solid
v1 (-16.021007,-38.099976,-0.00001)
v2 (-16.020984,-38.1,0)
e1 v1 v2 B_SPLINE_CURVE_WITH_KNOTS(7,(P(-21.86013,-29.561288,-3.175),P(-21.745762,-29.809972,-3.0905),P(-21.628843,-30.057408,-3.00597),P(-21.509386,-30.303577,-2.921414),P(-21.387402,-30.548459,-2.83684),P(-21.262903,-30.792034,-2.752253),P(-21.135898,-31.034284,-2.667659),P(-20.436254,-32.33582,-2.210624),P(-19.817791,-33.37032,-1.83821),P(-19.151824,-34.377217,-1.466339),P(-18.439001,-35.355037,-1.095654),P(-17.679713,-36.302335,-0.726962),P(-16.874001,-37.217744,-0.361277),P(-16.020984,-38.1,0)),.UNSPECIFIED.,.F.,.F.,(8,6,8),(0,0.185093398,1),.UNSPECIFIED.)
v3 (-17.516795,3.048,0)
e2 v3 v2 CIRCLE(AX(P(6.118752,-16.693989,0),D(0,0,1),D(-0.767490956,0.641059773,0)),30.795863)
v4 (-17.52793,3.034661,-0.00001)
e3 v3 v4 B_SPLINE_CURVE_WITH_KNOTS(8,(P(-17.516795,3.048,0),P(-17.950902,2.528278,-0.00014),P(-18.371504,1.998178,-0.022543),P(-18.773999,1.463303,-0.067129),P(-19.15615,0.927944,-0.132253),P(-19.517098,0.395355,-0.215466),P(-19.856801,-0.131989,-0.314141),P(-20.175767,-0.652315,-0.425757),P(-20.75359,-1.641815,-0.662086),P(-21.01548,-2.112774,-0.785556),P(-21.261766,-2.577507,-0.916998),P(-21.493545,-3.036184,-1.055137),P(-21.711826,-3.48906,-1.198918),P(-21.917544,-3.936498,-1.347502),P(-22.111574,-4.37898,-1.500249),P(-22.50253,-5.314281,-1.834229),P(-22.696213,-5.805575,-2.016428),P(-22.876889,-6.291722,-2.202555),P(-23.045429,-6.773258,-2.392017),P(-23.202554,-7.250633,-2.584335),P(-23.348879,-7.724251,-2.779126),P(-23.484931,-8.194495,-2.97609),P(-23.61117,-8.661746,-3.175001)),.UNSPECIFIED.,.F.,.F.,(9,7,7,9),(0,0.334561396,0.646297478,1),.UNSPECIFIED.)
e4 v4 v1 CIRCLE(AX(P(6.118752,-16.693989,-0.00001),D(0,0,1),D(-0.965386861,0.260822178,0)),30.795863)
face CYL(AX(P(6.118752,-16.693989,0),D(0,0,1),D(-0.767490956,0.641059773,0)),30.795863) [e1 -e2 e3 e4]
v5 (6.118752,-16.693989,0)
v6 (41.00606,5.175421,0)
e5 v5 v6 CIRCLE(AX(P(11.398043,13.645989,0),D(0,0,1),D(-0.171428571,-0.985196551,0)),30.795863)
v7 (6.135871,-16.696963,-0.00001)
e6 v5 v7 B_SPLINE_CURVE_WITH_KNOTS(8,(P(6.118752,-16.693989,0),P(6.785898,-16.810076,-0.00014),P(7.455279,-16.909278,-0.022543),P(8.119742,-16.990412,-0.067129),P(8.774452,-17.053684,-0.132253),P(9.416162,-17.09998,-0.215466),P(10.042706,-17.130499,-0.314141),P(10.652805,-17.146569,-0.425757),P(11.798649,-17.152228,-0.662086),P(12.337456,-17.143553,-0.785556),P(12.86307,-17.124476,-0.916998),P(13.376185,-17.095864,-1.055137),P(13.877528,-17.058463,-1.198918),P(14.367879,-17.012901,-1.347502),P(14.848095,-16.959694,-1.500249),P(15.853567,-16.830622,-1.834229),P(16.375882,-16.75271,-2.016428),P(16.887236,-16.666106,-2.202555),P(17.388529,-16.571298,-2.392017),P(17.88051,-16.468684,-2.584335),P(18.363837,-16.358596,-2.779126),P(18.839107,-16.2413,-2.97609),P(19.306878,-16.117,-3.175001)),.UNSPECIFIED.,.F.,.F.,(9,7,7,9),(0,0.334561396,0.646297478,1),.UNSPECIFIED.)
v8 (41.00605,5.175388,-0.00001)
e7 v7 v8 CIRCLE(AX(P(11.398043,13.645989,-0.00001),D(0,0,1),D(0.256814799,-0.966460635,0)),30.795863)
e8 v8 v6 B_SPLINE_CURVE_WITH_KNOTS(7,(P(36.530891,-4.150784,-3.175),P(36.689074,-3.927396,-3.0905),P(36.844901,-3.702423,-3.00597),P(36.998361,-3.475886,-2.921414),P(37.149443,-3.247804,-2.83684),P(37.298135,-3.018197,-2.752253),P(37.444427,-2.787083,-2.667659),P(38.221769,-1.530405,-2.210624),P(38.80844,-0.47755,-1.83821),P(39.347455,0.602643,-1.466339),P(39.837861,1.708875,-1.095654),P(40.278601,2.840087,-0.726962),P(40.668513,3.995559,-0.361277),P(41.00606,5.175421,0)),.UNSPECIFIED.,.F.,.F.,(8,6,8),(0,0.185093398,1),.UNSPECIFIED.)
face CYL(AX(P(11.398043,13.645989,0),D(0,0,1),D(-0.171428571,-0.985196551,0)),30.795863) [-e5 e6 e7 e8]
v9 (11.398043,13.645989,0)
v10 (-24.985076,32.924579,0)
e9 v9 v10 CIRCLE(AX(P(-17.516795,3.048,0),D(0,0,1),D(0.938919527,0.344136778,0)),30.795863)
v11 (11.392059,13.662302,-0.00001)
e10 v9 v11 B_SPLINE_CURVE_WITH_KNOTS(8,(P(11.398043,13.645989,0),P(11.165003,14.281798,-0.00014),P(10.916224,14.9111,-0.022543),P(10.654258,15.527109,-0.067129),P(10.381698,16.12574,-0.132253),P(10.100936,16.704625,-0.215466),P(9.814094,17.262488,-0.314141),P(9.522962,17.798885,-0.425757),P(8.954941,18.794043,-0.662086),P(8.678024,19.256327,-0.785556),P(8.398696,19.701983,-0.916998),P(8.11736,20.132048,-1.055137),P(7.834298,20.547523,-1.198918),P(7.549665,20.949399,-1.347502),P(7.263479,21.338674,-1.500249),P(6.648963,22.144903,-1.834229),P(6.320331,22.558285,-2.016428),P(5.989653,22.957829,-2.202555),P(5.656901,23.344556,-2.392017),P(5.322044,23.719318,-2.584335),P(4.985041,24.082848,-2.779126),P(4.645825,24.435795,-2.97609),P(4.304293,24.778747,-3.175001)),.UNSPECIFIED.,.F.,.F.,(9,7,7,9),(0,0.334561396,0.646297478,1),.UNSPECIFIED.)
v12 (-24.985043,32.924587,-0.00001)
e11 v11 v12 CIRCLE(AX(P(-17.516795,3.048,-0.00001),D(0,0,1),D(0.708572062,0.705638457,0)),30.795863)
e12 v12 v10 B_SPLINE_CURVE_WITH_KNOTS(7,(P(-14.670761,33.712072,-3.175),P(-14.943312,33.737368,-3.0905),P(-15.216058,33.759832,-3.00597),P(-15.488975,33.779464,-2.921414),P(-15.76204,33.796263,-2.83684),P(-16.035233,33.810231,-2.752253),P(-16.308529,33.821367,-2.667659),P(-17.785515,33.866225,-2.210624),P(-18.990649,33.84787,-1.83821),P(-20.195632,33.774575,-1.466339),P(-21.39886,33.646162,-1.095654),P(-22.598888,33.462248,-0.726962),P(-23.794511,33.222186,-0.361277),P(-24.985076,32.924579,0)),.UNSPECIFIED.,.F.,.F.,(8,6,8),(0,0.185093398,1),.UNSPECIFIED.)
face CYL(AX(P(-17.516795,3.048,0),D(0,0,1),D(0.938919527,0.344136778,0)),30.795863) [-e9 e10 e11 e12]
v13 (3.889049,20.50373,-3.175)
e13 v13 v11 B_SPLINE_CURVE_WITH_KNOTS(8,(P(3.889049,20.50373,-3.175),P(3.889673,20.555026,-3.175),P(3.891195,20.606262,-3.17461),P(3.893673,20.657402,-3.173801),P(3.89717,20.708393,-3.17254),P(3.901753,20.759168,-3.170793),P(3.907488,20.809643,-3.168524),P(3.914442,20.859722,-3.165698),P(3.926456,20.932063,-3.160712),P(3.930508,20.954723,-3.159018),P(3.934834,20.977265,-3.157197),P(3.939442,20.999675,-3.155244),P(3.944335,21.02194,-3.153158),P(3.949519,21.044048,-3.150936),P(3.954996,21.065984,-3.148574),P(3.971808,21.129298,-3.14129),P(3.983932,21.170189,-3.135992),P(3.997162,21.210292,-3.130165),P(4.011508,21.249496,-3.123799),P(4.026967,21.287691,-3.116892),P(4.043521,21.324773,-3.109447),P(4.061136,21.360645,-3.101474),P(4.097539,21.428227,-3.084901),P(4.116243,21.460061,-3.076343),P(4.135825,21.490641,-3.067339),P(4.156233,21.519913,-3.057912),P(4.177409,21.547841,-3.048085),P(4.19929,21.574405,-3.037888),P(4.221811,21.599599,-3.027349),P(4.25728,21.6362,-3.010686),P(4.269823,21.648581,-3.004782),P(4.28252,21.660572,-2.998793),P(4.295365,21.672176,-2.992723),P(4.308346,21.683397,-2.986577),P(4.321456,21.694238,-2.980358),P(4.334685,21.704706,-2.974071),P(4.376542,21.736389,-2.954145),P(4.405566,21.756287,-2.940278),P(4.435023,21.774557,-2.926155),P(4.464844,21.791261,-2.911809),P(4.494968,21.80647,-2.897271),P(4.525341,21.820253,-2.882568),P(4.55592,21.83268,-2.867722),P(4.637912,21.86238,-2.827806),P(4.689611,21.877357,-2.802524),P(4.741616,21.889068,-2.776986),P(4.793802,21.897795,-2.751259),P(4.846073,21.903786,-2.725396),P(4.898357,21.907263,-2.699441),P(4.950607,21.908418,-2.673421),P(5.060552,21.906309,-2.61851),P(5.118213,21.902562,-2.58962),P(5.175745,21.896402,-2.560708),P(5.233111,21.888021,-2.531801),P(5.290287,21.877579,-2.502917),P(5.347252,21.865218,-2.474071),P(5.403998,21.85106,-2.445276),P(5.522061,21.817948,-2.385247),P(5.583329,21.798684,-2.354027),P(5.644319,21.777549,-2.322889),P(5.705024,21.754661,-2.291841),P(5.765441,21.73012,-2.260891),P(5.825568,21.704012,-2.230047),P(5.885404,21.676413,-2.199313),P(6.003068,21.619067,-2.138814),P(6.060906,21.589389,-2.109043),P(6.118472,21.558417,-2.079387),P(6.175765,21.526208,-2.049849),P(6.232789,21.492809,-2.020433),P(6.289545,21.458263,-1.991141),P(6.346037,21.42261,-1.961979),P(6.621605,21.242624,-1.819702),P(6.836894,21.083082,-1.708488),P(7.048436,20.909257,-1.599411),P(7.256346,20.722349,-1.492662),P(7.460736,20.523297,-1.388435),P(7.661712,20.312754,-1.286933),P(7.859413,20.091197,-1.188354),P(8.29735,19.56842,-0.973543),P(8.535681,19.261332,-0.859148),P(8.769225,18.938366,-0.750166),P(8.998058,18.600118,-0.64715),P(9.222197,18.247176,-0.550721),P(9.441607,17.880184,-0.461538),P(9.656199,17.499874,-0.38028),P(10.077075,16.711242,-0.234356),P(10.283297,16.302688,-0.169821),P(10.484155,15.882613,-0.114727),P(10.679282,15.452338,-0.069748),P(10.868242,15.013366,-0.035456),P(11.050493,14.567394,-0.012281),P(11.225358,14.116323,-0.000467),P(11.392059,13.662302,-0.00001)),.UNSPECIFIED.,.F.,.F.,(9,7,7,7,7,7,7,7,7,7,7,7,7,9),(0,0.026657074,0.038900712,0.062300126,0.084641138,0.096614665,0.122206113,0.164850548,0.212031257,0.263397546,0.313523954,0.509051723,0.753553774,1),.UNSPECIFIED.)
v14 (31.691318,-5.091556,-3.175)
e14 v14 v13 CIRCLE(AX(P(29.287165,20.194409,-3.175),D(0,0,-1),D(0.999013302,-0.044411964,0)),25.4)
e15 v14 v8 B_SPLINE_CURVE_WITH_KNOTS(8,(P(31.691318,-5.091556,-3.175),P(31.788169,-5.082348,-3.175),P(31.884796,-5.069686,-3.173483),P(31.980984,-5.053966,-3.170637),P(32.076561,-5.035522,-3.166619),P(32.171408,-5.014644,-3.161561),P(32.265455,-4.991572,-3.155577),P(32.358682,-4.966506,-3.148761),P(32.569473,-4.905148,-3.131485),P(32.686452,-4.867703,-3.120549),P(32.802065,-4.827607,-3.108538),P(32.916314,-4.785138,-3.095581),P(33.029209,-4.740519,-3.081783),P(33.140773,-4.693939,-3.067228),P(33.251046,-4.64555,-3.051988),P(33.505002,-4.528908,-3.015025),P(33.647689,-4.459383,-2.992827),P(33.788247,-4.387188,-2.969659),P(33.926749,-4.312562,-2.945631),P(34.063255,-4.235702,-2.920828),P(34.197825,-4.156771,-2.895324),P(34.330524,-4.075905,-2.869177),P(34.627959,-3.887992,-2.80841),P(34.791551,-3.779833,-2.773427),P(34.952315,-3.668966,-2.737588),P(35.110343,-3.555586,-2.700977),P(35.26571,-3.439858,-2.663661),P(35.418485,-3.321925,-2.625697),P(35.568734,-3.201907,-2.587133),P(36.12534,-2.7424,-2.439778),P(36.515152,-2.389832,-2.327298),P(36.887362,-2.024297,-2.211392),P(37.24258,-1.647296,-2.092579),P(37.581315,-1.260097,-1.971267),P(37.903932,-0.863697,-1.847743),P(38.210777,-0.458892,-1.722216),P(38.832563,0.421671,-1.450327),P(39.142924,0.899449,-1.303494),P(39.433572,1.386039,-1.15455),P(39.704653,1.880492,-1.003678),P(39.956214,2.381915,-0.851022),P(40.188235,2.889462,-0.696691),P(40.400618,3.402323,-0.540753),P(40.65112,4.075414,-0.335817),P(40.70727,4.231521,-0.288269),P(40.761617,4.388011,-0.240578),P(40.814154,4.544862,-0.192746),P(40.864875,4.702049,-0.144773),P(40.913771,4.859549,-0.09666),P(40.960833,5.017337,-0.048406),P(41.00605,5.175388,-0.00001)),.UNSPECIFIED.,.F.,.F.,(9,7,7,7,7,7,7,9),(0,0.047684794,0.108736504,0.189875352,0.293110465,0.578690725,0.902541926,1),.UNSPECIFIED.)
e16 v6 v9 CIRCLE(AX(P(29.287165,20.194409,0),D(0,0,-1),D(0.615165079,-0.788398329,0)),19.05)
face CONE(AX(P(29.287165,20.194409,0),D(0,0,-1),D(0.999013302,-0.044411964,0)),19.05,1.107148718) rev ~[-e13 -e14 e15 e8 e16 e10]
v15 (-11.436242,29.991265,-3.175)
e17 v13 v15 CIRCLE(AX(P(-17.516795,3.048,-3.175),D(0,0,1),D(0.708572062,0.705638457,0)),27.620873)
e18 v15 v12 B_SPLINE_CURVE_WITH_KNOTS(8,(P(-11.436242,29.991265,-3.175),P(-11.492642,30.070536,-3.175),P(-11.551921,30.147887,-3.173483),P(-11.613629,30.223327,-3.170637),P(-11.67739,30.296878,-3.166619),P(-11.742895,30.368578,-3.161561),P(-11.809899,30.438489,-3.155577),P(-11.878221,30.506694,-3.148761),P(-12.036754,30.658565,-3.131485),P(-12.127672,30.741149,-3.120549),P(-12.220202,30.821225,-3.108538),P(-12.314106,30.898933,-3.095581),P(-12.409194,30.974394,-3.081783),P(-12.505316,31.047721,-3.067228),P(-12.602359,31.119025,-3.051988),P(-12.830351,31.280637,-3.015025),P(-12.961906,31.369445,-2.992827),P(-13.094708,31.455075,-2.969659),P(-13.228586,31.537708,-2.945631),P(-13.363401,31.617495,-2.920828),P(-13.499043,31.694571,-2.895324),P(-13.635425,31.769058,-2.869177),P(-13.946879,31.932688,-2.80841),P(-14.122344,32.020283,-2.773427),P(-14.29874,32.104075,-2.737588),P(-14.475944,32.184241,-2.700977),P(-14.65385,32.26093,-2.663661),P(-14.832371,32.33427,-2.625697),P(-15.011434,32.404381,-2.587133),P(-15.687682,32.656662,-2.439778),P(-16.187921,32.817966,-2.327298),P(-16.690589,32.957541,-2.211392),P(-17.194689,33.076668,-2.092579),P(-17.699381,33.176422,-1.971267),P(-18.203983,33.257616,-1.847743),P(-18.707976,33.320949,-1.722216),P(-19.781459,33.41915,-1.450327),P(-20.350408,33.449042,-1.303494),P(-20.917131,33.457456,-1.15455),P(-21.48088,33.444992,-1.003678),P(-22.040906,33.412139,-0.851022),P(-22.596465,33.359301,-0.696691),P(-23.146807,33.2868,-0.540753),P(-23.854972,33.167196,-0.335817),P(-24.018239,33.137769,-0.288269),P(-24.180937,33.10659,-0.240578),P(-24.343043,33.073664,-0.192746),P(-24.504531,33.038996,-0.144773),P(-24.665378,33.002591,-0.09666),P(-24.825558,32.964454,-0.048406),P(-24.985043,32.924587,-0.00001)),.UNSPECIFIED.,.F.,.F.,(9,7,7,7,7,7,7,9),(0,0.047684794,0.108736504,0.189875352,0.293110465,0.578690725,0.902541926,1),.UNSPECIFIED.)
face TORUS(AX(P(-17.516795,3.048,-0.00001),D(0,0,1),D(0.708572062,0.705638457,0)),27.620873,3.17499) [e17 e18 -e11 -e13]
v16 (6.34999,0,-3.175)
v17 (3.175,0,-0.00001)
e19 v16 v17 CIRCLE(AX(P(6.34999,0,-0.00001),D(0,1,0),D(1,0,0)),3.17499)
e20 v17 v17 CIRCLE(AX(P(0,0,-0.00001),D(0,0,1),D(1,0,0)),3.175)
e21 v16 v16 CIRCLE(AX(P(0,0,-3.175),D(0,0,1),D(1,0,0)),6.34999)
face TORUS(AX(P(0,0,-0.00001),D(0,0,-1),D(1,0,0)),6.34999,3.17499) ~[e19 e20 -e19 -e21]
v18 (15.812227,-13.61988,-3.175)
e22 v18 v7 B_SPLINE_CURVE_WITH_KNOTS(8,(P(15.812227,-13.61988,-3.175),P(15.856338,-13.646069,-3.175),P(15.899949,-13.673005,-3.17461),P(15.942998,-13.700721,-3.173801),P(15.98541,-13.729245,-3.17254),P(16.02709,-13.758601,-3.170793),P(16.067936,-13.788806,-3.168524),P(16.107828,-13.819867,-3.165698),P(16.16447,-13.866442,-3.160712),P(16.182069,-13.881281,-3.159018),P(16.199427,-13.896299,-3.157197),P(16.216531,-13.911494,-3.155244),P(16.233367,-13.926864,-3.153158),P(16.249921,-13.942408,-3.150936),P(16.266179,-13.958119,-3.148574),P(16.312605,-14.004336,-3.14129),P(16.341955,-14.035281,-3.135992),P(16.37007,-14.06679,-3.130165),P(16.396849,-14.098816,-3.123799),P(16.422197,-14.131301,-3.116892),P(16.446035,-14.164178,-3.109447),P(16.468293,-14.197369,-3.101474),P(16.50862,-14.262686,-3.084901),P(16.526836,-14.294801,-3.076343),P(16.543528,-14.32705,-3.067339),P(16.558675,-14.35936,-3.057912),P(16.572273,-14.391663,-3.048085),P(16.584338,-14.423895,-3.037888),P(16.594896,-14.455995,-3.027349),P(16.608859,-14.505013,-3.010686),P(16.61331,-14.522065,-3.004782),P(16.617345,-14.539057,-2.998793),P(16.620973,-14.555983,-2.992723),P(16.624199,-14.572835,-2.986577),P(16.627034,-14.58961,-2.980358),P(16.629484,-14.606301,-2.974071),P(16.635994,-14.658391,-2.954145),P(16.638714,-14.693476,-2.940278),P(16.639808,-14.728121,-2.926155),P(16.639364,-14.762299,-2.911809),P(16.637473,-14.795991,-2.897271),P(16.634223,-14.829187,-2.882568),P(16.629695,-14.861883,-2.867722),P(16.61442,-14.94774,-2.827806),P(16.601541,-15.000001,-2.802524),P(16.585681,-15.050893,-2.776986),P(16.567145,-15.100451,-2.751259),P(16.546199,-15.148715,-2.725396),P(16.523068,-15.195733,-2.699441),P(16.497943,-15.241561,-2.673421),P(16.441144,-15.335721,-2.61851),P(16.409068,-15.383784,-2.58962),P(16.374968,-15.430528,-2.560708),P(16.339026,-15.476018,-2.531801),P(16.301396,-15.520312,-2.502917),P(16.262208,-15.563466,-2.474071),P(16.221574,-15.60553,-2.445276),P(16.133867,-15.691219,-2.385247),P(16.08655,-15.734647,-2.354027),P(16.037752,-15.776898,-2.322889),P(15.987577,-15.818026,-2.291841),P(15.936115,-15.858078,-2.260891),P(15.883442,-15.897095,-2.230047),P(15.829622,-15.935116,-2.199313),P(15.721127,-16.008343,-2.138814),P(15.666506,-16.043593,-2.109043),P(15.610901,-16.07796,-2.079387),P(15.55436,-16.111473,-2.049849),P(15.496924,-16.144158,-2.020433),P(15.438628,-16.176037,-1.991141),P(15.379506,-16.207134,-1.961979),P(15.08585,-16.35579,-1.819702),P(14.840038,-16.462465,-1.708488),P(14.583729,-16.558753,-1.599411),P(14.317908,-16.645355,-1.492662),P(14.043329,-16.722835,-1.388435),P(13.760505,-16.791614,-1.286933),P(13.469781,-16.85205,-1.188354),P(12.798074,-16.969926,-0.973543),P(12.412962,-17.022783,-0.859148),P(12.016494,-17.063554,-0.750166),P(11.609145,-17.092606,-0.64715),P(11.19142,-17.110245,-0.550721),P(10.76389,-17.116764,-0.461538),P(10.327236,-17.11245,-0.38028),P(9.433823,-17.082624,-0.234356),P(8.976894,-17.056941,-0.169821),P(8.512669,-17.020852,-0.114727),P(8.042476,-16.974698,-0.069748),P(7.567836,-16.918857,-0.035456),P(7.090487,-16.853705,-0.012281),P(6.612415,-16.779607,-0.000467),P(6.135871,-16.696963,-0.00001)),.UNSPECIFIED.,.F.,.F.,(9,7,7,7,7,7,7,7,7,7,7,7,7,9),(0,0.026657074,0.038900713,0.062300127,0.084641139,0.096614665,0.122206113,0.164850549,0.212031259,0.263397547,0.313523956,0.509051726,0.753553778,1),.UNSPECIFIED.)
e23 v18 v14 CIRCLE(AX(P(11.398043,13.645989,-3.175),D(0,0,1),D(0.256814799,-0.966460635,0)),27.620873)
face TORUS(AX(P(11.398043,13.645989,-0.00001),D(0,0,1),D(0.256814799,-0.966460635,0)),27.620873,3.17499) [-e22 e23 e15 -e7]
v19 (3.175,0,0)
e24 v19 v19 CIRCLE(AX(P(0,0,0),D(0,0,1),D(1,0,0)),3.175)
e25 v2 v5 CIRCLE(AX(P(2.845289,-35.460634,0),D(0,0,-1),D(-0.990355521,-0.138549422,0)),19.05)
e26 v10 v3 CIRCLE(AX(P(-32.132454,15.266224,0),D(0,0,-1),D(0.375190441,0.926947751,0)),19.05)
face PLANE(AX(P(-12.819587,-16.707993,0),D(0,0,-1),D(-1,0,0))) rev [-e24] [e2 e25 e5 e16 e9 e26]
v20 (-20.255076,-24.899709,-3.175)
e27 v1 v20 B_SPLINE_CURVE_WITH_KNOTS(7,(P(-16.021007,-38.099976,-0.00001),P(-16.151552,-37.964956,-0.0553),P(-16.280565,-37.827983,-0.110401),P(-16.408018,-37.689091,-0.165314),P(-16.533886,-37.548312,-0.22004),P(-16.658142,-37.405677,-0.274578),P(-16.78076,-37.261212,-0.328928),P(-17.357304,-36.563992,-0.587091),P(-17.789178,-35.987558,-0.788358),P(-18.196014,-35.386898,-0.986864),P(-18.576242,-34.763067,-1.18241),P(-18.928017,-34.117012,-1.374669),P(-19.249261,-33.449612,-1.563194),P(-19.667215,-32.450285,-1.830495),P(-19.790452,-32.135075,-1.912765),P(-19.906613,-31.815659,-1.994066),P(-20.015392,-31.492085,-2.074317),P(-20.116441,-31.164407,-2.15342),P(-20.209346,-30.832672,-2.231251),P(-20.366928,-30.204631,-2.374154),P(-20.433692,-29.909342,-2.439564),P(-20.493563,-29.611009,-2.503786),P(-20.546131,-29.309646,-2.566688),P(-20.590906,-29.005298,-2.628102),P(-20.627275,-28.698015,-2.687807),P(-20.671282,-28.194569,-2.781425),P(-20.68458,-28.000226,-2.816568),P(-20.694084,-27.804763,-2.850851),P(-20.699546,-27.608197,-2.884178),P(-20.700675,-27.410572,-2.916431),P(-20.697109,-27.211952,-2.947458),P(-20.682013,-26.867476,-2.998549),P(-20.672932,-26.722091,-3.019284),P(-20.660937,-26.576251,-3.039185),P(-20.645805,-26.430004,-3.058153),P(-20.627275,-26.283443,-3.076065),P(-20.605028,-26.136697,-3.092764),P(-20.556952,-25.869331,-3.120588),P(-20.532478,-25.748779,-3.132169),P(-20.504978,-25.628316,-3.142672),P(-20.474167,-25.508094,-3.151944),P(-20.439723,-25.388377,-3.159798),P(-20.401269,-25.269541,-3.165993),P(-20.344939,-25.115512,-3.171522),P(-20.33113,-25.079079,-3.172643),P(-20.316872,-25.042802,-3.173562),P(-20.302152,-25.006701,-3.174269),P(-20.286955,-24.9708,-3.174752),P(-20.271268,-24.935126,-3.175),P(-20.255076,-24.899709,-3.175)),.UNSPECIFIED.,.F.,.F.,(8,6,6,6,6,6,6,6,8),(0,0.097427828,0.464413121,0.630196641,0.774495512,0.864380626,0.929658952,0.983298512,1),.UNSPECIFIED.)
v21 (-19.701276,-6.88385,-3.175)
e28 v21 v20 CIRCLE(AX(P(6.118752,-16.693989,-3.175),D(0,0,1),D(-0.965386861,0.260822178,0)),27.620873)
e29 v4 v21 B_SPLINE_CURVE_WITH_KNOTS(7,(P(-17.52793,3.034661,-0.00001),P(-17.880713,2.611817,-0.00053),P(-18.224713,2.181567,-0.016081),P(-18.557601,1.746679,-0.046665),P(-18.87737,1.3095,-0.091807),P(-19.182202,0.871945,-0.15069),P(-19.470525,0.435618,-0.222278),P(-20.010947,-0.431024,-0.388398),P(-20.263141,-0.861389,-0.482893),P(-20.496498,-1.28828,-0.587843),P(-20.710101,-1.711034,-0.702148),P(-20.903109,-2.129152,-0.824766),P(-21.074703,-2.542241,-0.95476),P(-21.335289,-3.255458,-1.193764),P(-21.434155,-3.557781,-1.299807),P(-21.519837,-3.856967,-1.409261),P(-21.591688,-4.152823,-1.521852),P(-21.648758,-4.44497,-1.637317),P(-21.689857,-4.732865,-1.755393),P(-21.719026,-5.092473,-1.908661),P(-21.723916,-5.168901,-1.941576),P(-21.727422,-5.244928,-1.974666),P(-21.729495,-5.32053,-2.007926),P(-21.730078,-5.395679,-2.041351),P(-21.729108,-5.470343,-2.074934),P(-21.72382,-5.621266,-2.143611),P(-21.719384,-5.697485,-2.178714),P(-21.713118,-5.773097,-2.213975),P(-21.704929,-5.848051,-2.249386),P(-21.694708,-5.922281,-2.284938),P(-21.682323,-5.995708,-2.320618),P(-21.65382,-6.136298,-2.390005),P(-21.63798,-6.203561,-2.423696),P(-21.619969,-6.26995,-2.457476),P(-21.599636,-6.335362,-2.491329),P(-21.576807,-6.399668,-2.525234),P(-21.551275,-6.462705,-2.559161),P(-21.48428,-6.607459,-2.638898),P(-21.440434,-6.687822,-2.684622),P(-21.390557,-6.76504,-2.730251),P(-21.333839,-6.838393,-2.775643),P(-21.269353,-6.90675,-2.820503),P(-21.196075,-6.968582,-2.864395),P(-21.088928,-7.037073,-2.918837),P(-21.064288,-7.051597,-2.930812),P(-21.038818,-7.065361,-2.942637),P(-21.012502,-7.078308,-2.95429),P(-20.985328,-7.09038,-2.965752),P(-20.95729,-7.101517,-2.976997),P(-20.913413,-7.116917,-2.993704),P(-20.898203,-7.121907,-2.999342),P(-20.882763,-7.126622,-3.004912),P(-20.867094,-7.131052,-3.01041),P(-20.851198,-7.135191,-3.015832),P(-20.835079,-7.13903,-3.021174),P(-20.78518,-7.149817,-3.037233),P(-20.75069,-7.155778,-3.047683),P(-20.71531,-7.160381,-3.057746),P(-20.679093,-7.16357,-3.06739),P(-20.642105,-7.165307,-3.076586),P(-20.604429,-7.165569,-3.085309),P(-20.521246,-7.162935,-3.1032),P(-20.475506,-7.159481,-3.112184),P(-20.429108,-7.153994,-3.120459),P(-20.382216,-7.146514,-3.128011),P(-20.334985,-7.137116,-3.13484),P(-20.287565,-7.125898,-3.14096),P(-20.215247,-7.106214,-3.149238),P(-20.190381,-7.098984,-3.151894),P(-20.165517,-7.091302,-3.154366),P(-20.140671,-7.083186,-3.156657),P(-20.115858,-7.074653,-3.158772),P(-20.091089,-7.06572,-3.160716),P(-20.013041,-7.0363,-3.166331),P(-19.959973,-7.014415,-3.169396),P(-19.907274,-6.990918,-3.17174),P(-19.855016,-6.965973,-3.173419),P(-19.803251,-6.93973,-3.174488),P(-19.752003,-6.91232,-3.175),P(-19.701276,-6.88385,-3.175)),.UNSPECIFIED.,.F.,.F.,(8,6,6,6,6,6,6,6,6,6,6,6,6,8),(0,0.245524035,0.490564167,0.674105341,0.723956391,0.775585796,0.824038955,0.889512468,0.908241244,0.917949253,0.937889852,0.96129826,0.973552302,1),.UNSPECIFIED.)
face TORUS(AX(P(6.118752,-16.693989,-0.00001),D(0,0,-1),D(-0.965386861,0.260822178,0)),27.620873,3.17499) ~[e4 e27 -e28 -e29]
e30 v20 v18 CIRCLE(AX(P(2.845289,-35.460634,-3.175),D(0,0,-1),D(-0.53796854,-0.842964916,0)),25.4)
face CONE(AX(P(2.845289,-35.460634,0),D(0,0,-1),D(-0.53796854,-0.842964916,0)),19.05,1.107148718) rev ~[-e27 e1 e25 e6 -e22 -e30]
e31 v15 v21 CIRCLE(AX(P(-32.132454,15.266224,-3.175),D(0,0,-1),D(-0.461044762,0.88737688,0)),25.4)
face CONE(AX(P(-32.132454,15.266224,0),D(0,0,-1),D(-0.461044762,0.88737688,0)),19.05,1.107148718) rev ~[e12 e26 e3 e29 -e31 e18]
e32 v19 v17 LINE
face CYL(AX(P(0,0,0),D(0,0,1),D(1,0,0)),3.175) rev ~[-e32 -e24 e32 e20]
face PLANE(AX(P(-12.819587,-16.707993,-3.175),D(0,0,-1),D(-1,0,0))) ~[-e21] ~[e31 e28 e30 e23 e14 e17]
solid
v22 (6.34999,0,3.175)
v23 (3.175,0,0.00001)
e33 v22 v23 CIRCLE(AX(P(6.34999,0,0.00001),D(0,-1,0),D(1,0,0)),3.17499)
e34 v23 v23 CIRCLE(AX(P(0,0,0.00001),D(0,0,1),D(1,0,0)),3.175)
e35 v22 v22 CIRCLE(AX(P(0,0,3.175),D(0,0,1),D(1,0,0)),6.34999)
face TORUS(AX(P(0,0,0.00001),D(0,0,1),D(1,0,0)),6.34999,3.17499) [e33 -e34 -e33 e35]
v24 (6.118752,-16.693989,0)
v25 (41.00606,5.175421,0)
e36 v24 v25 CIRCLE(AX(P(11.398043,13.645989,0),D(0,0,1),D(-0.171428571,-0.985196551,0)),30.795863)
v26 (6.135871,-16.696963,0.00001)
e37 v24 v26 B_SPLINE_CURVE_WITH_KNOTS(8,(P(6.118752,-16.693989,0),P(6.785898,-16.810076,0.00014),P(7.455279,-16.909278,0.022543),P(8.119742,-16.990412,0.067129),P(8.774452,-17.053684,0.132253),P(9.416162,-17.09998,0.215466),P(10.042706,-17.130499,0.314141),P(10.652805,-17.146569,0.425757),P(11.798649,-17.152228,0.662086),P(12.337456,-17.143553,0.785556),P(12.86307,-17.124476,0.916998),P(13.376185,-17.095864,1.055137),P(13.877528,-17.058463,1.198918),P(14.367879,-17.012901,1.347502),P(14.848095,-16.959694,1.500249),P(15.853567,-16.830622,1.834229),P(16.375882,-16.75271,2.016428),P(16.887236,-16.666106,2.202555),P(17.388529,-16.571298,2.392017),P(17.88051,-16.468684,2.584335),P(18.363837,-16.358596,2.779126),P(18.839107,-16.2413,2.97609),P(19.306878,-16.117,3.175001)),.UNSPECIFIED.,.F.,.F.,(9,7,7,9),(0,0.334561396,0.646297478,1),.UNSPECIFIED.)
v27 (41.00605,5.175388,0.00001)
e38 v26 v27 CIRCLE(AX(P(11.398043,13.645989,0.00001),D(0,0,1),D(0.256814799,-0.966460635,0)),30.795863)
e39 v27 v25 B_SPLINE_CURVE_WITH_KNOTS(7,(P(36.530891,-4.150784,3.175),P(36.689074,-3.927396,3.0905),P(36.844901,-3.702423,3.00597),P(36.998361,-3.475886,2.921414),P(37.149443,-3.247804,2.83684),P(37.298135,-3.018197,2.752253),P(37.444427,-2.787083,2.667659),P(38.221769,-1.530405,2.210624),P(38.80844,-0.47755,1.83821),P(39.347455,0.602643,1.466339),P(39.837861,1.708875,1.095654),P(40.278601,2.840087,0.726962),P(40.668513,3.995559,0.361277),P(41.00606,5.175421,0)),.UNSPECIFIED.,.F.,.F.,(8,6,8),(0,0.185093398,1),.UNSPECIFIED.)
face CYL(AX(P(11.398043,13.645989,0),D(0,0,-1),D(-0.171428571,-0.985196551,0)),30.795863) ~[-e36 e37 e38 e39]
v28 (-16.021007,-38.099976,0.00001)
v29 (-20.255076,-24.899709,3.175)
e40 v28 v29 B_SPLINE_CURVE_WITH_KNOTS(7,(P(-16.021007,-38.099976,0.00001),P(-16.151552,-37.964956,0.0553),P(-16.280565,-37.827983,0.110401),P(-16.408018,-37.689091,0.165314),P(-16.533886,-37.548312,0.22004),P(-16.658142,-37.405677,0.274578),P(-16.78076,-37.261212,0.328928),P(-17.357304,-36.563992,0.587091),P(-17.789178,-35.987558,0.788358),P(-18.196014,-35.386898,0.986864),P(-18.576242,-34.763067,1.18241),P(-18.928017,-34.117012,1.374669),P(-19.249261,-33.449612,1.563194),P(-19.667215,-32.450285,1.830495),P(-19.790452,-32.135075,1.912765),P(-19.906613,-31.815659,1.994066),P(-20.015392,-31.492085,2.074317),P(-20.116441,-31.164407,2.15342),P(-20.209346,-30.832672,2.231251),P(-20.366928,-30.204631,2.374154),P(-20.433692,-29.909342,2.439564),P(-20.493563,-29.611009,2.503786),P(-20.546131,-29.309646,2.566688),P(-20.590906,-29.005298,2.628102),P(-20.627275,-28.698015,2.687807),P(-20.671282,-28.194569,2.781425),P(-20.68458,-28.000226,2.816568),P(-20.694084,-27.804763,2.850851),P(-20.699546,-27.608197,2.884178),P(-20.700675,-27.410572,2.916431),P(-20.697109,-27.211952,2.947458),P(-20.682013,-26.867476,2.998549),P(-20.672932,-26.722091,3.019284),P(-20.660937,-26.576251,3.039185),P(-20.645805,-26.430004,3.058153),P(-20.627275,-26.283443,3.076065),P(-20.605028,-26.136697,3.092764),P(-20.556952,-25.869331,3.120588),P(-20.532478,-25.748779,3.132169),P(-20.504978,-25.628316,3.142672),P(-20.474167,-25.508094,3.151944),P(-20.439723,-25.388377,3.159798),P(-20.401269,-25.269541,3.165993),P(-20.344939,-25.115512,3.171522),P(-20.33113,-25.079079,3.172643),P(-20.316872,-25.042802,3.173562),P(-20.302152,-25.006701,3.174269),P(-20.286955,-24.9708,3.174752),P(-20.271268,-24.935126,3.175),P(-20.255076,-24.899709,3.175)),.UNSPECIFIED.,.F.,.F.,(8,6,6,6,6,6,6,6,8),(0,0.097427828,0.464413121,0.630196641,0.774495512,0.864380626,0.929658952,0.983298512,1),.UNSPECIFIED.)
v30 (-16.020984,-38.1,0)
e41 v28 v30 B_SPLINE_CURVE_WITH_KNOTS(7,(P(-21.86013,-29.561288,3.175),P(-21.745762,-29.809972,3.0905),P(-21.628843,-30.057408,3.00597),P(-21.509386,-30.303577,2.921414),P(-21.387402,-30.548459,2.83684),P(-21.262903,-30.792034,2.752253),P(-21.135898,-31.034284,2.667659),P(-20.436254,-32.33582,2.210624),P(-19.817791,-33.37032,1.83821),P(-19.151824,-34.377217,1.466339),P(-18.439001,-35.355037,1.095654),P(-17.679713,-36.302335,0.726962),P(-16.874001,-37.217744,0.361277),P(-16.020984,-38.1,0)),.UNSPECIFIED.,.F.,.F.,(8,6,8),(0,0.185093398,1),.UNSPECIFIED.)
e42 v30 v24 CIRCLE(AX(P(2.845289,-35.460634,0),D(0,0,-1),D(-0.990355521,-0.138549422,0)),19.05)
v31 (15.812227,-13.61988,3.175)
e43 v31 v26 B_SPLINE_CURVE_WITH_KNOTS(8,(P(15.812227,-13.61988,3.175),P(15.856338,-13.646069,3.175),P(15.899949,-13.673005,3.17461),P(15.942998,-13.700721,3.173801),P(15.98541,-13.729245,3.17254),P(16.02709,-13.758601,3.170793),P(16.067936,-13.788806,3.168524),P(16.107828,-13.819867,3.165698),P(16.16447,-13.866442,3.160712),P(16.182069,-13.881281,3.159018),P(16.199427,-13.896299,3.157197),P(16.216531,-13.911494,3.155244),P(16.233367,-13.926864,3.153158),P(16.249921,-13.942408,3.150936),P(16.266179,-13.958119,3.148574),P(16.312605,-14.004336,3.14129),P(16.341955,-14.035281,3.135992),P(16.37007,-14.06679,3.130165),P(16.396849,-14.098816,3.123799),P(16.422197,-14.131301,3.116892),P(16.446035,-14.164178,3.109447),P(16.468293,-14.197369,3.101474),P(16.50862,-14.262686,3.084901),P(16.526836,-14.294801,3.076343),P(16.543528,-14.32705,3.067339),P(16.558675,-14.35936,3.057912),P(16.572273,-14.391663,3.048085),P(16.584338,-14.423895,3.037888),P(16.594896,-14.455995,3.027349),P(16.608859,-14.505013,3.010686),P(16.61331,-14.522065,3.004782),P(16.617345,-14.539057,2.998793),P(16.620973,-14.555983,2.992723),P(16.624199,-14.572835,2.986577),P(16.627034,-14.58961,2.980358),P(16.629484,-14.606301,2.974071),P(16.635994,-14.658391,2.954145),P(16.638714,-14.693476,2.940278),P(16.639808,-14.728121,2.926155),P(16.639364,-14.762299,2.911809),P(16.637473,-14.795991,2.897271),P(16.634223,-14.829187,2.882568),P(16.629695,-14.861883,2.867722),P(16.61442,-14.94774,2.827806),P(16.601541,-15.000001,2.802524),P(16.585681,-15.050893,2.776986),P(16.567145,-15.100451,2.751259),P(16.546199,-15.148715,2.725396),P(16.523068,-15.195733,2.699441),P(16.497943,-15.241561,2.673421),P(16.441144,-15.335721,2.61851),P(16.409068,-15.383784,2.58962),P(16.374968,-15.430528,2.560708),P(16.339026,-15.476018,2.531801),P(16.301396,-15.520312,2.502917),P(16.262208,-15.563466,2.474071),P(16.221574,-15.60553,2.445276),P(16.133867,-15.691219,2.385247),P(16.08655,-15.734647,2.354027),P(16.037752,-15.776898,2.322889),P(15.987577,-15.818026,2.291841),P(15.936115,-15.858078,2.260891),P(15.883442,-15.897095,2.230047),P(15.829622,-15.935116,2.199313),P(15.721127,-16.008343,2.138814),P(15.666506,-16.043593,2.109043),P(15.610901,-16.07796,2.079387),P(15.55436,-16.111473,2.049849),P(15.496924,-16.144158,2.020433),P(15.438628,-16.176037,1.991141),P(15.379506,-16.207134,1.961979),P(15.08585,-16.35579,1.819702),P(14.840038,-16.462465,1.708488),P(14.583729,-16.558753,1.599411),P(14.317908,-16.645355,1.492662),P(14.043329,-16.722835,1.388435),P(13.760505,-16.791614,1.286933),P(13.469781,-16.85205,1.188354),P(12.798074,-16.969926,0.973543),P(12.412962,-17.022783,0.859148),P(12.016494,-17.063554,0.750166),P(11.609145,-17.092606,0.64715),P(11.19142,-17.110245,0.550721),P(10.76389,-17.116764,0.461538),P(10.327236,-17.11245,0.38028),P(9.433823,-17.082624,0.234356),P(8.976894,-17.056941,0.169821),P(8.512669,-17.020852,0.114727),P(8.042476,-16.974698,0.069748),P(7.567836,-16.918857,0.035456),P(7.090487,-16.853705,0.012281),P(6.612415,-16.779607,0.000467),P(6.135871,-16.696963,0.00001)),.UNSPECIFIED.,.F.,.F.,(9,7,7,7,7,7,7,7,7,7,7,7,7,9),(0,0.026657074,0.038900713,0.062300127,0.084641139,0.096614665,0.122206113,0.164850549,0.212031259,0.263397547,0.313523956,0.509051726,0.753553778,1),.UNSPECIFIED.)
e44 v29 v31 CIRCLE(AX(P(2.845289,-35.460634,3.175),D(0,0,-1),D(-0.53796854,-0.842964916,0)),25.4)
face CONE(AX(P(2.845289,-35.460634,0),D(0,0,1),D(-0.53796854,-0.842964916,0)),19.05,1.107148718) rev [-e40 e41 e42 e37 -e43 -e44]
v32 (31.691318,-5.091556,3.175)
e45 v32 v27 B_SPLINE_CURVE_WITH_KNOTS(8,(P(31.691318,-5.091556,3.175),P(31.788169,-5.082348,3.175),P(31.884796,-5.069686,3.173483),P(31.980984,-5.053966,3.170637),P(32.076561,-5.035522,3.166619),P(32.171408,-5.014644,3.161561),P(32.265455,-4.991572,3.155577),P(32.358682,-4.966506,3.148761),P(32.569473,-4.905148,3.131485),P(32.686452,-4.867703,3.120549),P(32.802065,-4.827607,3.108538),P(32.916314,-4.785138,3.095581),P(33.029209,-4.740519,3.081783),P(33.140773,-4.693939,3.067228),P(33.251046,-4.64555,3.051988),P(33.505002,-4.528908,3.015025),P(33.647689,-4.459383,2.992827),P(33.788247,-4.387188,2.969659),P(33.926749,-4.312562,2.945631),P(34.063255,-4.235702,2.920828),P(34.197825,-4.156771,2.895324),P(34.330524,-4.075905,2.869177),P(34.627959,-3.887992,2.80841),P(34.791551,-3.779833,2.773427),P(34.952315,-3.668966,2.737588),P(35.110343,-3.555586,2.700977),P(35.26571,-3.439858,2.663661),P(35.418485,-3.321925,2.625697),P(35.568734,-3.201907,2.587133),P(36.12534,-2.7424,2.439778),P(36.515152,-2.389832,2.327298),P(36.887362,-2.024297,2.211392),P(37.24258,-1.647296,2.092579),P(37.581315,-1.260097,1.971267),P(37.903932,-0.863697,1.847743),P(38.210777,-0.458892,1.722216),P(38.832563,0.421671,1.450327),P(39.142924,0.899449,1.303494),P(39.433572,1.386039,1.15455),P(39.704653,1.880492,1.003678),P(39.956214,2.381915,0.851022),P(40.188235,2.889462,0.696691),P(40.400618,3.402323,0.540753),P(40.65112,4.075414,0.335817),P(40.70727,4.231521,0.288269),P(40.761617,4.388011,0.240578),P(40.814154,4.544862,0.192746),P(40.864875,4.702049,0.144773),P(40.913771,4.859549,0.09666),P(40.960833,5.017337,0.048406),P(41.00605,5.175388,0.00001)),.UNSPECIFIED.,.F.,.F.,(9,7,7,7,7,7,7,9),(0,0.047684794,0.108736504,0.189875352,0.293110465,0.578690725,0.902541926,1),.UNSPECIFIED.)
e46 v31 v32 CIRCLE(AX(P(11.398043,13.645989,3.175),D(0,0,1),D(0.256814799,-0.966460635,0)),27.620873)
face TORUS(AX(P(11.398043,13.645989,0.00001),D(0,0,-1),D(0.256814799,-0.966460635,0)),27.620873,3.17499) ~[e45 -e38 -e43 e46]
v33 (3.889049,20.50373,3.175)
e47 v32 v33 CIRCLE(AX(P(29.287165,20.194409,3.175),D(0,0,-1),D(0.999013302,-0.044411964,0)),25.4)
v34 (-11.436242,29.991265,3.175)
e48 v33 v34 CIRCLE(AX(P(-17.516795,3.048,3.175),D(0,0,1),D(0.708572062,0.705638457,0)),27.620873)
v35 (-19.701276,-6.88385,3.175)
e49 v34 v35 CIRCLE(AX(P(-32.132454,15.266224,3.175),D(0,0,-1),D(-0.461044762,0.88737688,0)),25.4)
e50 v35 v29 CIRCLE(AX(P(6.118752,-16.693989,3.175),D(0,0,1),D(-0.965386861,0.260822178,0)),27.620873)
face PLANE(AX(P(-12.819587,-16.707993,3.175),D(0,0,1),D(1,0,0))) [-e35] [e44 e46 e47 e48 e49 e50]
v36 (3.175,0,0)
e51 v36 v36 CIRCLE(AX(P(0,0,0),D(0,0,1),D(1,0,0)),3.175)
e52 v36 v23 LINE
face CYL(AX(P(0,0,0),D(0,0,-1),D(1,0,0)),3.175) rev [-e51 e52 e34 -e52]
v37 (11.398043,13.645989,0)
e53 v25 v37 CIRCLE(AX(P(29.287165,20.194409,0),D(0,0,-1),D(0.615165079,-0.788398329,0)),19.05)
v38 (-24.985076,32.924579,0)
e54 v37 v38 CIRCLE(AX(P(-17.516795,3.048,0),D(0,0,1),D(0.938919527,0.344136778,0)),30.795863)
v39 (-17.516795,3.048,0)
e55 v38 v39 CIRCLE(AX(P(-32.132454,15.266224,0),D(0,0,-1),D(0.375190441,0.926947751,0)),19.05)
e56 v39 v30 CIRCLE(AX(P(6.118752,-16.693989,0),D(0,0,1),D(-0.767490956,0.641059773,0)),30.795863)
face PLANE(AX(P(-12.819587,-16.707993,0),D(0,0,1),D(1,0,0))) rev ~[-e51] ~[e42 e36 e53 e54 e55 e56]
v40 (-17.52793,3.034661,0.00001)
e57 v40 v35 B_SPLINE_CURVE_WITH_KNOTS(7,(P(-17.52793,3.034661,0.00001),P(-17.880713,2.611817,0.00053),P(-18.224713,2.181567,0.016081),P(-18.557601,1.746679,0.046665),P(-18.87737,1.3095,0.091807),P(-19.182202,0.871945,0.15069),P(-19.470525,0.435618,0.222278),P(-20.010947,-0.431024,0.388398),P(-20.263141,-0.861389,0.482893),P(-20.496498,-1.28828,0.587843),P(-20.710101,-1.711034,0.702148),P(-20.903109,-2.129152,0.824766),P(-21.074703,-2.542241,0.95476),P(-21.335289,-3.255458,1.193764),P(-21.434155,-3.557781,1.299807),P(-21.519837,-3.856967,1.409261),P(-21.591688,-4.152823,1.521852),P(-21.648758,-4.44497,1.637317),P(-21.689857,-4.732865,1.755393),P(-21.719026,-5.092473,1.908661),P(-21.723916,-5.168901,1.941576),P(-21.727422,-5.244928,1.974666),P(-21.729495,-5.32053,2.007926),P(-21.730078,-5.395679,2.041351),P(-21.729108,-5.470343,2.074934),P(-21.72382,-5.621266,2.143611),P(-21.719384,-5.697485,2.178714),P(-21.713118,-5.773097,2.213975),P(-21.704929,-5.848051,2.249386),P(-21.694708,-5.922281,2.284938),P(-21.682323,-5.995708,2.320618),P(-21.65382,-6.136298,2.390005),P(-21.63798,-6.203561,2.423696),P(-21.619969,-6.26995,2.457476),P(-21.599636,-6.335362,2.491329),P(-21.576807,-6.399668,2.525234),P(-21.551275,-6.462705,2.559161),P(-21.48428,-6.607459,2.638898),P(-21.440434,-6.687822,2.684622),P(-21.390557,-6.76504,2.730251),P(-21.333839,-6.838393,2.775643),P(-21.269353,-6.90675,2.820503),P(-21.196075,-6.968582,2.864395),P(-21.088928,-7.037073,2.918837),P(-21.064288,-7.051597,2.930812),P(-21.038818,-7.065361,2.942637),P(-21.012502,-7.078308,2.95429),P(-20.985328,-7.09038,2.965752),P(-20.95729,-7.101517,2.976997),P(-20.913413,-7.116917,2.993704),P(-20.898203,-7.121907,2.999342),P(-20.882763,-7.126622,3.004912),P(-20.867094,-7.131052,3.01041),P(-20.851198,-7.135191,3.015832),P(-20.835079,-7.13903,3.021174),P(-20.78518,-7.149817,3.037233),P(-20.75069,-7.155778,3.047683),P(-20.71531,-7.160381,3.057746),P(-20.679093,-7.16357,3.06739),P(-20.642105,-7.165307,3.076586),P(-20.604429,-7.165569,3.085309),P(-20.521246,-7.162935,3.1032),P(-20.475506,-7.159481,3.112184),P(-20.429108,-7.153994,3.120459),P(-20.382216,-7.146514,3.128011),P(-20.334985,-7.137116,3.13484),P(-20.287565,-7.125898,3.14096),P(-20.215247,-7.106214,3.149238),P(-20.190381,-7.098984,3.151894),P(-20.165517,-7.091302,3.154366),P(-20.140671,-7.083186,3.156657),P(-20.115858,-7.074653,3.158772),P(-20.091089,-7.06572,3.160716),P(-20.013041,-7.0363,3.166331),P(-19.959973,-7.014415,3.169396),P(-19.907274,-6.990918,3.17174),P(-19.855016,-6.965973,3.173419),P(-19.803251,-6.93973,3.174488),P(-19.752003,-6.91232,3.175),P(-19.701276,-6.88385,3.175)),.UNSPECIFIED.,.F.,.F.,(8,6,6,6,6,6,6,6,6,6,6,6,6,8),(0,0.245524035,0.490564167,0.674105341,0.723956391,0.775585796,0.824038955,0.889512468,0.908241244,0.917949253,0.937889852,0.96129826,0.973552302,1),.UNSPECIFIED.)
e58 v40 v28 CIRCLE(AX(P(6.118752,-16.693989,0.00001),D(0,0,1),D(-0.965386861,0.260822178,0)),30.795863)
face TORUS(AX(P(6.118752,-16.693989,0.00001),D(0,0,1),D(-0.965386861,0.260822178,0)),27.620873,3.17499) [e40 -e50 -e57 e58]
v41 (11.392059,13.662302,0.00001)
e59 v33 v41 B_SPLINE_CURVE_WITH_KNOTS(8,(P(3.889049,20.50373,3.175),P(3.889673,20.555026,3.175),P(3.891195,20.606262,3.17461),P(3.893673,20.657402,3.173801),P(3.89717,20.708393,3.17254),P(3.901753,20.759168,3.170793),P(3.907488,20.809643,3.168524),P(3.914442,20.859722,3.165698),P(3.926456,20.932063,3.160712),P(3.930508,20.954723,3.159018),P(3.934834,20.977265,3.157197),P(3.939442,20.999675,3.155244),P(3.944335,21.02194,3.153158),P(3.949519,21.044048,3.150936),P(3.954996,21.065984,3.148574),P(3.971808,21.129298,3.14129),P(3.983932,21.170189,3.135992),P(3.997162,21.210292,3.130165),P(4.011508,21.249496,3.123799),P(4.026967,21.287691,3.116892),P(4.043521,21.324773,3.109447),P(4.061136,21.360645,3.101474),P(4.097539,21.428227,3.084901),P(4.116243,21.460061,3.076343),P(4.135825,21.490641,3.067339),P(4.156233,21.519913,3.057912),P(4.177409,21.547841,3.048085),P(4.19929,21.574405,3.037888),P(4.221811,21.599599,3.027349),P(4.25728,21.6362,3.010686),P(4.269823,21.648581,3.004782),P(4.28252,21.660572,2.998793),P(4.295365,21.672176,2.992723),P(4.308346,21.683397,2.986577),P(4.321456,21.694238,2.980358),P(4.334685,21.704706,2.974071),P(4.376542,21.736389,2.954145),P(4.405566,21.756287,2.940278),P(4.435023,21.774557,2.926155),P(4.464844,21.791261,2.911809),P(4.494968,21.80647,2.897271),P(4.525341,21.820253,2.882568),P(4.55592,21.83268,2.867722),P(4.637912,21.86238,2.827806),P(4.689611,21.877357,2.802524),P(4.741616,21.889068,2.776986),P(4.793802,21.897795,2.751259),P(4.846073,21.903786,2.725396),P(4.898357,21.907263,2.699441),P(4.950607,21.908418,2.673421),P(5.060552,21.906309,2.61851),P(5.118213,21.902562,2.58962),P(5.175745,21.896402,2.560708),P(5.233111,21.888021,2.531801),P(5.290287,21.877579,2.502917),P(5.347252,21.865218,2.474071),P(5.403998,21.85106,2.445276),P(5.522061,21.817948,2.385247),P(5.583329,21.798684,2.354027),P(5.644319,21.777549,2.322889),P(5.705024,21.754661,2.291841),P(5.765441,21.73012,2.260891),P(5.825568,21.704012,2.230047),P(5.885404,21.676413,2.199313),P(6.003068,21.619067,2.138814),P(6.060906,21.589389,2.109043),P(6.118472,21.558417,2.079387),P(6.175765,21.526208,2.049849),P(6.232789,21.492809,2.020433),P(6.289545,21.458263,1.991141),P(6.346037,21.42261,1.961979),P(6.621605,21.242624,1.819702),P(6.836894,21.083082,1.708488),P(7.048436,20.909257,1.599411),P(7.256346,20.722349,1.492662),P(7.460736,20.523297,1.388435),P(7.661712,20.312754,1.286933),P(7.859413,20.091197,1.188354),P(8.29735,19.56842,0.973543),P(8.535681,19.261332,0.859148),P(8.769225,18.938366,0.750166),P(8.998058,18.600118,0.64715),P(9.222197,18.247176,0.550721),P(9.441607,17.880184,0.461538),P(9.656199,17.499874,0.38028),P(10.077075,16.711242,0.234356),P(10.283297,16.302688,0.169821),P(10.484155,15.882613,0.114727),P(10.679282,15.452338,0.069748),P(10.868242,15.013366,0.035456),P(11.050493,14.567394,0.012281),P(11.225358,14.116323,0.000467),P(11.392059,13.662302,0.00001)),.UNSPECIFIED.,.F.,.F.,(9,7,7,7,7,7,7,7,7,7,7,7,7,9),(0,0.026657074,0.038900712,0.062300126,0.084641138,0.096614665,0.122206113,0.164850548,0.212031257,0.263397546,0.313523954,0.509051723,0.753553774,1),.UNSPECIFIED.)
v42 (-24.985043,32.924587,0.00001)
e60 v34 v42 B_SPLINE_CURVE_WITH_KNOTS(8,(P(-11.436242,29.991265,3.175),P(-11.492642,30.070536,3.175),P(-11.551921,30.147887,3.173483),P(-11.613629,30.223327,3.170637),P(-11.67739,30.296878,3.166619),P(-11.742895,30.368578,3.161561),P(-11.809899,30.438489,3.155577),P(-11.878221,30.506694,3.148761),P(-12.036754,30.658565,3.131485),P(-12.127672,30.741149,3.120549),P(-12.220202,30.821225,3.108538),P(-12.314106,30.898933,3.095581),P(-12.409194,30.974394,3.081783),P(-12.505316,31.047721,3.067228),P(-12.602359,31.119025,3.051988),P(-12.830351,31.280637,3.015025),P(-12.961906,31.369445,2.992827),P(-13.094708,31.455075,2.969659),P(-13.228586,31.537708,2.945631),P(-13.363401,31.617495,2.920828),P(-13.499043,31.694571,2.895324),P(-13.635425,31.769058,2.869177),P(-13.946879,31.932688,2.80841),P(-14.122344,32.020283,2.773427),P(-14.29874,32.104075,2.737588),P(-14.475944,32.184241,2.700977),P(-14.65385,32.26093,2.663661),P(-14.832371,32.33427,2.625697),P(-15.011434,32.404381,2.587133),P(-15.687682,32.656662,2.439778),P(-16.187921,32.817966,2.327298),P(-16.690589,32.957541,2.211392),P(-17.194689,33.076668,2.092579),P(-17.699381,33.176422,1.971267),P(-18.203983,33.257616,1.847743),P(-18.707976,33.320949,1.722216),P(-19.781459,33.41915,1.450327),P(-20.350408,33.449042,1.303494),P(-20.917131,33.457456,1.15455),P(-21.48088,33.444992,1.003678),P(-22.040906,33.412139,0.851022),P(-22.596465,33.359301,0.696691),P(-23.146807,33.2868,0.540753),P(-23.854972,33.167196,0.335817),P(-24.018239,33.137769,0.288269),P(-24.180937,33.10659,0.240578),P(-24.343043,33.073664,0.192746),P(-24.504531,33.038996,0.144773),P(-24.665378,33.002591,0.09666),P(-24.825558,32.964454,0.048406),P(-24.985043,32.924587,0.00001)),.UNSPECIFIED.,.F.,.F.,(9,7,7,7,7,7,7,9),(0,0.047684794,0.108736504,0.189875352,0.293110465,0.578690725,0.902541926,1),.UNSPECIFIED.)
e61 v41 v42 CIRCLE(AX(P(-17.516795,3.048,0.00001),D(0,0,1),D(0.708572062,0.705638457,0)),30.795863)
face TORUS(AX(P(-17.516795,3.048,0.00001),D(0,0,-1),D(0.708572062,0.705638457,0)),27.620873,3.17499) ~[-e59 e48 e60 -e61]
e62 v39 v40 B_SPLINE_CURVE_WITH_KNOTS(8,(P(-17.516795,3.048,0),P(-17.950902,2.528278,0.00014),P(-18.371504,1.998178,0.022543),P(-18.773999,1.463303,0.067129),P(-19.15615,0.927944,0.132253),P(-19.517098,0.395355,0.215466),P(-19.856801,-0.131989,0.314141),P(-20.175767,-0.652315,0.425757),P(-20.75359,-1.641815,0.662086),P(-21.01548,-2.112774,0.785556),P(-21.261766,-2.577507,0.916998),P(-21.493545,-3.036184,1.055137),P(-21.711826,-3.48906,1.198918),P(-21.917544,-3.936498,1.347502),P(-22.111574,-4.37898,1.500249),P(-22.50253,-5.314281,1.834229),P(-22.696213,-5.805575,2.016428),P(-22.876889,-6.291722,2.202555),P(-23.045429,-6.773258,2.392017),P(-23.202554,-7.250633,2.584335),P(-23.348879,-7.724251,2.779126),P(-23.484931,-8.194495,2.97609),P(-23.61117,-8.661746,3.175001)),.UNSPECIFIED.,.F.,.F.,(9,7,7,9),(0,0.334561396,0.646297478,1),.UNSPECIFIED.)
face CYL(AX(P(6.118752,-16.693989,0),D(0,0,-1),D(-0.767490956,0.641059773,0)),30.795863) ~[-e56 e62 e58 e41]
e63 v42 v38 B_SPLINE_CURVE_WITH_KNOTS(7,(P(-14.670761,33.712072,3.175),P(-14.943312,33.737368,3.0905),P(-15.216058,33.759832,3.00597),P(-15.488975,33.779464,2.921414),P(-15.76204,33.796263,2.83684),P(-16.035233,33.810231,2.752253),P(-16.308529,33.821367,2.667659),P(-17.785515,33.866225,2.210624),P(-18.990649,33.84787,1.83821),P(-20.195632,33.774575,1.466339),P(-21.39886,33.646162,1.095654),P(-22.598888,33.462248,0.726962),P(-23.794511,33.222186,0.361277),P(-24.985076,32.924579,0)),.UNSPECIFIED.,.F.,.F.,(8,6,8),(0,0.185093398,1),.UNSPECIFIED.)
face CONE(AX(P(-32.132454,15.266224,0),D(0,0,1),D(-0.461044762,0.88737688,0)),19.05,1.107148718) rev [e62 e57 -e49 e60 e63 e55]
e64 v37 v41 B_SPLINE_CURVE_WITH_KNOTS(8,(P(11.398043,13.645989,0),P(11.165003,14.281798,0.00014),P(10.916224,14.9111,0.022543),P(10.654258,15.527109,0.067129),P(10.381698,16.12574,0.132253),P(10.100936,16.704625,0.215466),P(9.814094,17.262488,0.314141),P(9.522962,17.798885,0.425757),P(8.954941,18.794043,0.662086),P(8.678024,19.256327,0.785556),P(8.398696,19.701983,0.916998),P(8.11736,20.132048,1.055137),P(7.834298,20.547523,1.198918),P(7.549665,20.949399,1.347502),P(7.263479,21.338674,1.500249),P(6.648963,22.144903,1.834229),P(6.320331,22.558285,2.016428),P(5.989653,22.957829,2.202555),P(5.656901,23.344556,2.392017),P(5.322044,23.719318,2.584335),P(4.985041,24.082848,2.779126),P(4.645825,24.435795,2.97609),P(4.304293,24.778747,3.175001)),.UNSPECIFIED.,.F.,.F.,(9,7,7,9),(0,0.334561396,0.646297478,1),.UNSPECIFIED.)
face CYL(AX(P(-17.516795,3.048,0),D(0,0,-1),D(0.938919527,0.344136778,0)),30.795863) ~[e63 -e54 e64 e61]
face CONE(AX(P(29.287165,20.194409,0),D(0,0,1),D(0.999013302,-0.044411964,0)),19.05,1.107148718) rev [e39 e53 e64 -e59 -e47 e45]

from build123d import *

# Parameters (mm, degrees)
F0_R        = 3.175
F1_DEPTH    = 3.175
F2_T2_ANGLE = 206.8397195509
F2_T4_ANGLE = 206.8397195509
F2_T6_ANGLE = 206.8397195509
F3_R        = 3.17499


# Not quite as in the source:
# - a fillet or chamfer that OpenCascade refuses, or shapes differently, is made with other operations: its cross-section is extruded or revolved along the edge and cut away or added
# - a fillet or chamfer is up to 0.001 mm smaller than in the source, because OpenCascade refuses the exact size


with BuildPart() as f1:
    # F0 (on Top) → F1 (new body)
    with BuildSketch(Plane.XY):
        with BuildLine():
            Line((6.1187519112, -16.6939891892), (-17.516794684, 3.048))
            ThreePointArc((-17.516794684, 3.048), (-24.6567837547, -17.812740491), (-16.0209838859, -38.1))
            ThreePointArc((-16.0209838859, -38.1), (-10.3962463249, -21.7652237747), (6.1187519112, -16.6939891892))
        make_face()
        with BuildLine():
            ThreePointArc((41.0060598271, 5.1754209612), (24.0473598704, 1.879198466), (11.3980427727, 13.6459891892))
            Line((11.3980427727, 13.6459891892), (6.1187519112, -16.6939891892))
            ThreePointArc((6.1187519112, -16.6939891892), (27.7546776535, -12.4470308617), (41.0060598271, 5.1754209612))
        make_face()
        with BuildLine():
            ThreePointArc((-24.9850759412, 32.9245790388), (-13.6511135455, 19.8860253087), (-17.516794684, 3.048))
            Line((-17.516794684, 3.048), (11.3980427727, 13.6459891892))
            ThreePointArc((11.3980427727, 13.6459891892), (-3.0978938988, 30.2597713527), (-24.9850759412, 32.9245790388))
        make_face()
        Polygon((11.3980427727, 13.6459891892), (-17.516794684, 3.048), (6.1187519112, -16.6939891892), align=None)
        Circle(F0_R, mode=Mode.SUBTRACT)
    extrude(amount=F1_DEPTH)

    # F2: chamfer of 3.175 x 6.35 on 3 edges, made by hand

    # F2_s1 → F2_t2 (revolve, cut)
    with BuildSketch(Plane(origin=(0.9537550873, 21.4539943341, 0), x_dir=(0, 0, 1), z_dir=(0.0444119638, 0.999013302, 0))):
        Polygon((0, 47.4113941081), (3.175, 53.7613941081), (3.175, 47.4113941081), align=None)
    revolve(axis=Axis((29.2871650632, 20.1944091266, 3.175), (0, 0, -1)), revolution_arc=F2_T2_ANGLE, mode=Mode.SUBTRACT)

    # F2_s3 → F2_t4 (revolve, cut)
    with BuildSketch(Plane(origin=(-19.0565816496, -9.9010210324, 0), x_dir=(0, 0, 1), z_dir=(-0.8873768801, -0.4610447621, 0))):
        Polygon((0, 47.4113941081), (3.175, 53.7613941081), (3.175, 47.4113941081), align=None)
    revolve(axis=Axis((-32.1324538496, 15.2662243863, 3.175), (0, 0, -1)), revolution_arc=F2_T4_ANGLE, mode=Mode.SUBTRACT)

    # F2_s5 → F2_t6 (revolve, cut)
    with BuildSketch(Plane(origin=(18.1028265623, -11.5529733017, 0), x_dir=(0, 0, 1), z_dir=(0.8429649163, -0.5379685398, 0))):
        Polygon((0, 47.4113941081), (3.175, 53.7613941081), (3.175, 47.4113941081), align=None)
    revolve(axis=Axis((2.8452887864, -35.4606335128, 3.175), (0, 0, -1)), revolution_arc=F2_T6_ANGLE, mode=Mode.SUBTRACT)

    # F3 (radius 3.175 in the source; OpenCascade refuses exactly that, so slightly less here)
    f3_edges = [f1.edges().sort_by_distance(p)[0] for p in [
        (-4.399333, 30.910473, 3.175),
        (28.968921, -11.645302, 3.175),
        (-24.569588, -19.26517, 3.175),
        (-3.175, 0, 3.175),
    ]]
    fillet(f3_edges, radius=F3_R)


with BuildPart() as f4_1:
    # F4: instance of F1
    add(f1.part.mirror(Plane(origin=(0, 0, 0), x_dir=(1, 0, 0), z_dir=(0, 0, -1))))


solid = Compound([f1.part, f4_1.part])
